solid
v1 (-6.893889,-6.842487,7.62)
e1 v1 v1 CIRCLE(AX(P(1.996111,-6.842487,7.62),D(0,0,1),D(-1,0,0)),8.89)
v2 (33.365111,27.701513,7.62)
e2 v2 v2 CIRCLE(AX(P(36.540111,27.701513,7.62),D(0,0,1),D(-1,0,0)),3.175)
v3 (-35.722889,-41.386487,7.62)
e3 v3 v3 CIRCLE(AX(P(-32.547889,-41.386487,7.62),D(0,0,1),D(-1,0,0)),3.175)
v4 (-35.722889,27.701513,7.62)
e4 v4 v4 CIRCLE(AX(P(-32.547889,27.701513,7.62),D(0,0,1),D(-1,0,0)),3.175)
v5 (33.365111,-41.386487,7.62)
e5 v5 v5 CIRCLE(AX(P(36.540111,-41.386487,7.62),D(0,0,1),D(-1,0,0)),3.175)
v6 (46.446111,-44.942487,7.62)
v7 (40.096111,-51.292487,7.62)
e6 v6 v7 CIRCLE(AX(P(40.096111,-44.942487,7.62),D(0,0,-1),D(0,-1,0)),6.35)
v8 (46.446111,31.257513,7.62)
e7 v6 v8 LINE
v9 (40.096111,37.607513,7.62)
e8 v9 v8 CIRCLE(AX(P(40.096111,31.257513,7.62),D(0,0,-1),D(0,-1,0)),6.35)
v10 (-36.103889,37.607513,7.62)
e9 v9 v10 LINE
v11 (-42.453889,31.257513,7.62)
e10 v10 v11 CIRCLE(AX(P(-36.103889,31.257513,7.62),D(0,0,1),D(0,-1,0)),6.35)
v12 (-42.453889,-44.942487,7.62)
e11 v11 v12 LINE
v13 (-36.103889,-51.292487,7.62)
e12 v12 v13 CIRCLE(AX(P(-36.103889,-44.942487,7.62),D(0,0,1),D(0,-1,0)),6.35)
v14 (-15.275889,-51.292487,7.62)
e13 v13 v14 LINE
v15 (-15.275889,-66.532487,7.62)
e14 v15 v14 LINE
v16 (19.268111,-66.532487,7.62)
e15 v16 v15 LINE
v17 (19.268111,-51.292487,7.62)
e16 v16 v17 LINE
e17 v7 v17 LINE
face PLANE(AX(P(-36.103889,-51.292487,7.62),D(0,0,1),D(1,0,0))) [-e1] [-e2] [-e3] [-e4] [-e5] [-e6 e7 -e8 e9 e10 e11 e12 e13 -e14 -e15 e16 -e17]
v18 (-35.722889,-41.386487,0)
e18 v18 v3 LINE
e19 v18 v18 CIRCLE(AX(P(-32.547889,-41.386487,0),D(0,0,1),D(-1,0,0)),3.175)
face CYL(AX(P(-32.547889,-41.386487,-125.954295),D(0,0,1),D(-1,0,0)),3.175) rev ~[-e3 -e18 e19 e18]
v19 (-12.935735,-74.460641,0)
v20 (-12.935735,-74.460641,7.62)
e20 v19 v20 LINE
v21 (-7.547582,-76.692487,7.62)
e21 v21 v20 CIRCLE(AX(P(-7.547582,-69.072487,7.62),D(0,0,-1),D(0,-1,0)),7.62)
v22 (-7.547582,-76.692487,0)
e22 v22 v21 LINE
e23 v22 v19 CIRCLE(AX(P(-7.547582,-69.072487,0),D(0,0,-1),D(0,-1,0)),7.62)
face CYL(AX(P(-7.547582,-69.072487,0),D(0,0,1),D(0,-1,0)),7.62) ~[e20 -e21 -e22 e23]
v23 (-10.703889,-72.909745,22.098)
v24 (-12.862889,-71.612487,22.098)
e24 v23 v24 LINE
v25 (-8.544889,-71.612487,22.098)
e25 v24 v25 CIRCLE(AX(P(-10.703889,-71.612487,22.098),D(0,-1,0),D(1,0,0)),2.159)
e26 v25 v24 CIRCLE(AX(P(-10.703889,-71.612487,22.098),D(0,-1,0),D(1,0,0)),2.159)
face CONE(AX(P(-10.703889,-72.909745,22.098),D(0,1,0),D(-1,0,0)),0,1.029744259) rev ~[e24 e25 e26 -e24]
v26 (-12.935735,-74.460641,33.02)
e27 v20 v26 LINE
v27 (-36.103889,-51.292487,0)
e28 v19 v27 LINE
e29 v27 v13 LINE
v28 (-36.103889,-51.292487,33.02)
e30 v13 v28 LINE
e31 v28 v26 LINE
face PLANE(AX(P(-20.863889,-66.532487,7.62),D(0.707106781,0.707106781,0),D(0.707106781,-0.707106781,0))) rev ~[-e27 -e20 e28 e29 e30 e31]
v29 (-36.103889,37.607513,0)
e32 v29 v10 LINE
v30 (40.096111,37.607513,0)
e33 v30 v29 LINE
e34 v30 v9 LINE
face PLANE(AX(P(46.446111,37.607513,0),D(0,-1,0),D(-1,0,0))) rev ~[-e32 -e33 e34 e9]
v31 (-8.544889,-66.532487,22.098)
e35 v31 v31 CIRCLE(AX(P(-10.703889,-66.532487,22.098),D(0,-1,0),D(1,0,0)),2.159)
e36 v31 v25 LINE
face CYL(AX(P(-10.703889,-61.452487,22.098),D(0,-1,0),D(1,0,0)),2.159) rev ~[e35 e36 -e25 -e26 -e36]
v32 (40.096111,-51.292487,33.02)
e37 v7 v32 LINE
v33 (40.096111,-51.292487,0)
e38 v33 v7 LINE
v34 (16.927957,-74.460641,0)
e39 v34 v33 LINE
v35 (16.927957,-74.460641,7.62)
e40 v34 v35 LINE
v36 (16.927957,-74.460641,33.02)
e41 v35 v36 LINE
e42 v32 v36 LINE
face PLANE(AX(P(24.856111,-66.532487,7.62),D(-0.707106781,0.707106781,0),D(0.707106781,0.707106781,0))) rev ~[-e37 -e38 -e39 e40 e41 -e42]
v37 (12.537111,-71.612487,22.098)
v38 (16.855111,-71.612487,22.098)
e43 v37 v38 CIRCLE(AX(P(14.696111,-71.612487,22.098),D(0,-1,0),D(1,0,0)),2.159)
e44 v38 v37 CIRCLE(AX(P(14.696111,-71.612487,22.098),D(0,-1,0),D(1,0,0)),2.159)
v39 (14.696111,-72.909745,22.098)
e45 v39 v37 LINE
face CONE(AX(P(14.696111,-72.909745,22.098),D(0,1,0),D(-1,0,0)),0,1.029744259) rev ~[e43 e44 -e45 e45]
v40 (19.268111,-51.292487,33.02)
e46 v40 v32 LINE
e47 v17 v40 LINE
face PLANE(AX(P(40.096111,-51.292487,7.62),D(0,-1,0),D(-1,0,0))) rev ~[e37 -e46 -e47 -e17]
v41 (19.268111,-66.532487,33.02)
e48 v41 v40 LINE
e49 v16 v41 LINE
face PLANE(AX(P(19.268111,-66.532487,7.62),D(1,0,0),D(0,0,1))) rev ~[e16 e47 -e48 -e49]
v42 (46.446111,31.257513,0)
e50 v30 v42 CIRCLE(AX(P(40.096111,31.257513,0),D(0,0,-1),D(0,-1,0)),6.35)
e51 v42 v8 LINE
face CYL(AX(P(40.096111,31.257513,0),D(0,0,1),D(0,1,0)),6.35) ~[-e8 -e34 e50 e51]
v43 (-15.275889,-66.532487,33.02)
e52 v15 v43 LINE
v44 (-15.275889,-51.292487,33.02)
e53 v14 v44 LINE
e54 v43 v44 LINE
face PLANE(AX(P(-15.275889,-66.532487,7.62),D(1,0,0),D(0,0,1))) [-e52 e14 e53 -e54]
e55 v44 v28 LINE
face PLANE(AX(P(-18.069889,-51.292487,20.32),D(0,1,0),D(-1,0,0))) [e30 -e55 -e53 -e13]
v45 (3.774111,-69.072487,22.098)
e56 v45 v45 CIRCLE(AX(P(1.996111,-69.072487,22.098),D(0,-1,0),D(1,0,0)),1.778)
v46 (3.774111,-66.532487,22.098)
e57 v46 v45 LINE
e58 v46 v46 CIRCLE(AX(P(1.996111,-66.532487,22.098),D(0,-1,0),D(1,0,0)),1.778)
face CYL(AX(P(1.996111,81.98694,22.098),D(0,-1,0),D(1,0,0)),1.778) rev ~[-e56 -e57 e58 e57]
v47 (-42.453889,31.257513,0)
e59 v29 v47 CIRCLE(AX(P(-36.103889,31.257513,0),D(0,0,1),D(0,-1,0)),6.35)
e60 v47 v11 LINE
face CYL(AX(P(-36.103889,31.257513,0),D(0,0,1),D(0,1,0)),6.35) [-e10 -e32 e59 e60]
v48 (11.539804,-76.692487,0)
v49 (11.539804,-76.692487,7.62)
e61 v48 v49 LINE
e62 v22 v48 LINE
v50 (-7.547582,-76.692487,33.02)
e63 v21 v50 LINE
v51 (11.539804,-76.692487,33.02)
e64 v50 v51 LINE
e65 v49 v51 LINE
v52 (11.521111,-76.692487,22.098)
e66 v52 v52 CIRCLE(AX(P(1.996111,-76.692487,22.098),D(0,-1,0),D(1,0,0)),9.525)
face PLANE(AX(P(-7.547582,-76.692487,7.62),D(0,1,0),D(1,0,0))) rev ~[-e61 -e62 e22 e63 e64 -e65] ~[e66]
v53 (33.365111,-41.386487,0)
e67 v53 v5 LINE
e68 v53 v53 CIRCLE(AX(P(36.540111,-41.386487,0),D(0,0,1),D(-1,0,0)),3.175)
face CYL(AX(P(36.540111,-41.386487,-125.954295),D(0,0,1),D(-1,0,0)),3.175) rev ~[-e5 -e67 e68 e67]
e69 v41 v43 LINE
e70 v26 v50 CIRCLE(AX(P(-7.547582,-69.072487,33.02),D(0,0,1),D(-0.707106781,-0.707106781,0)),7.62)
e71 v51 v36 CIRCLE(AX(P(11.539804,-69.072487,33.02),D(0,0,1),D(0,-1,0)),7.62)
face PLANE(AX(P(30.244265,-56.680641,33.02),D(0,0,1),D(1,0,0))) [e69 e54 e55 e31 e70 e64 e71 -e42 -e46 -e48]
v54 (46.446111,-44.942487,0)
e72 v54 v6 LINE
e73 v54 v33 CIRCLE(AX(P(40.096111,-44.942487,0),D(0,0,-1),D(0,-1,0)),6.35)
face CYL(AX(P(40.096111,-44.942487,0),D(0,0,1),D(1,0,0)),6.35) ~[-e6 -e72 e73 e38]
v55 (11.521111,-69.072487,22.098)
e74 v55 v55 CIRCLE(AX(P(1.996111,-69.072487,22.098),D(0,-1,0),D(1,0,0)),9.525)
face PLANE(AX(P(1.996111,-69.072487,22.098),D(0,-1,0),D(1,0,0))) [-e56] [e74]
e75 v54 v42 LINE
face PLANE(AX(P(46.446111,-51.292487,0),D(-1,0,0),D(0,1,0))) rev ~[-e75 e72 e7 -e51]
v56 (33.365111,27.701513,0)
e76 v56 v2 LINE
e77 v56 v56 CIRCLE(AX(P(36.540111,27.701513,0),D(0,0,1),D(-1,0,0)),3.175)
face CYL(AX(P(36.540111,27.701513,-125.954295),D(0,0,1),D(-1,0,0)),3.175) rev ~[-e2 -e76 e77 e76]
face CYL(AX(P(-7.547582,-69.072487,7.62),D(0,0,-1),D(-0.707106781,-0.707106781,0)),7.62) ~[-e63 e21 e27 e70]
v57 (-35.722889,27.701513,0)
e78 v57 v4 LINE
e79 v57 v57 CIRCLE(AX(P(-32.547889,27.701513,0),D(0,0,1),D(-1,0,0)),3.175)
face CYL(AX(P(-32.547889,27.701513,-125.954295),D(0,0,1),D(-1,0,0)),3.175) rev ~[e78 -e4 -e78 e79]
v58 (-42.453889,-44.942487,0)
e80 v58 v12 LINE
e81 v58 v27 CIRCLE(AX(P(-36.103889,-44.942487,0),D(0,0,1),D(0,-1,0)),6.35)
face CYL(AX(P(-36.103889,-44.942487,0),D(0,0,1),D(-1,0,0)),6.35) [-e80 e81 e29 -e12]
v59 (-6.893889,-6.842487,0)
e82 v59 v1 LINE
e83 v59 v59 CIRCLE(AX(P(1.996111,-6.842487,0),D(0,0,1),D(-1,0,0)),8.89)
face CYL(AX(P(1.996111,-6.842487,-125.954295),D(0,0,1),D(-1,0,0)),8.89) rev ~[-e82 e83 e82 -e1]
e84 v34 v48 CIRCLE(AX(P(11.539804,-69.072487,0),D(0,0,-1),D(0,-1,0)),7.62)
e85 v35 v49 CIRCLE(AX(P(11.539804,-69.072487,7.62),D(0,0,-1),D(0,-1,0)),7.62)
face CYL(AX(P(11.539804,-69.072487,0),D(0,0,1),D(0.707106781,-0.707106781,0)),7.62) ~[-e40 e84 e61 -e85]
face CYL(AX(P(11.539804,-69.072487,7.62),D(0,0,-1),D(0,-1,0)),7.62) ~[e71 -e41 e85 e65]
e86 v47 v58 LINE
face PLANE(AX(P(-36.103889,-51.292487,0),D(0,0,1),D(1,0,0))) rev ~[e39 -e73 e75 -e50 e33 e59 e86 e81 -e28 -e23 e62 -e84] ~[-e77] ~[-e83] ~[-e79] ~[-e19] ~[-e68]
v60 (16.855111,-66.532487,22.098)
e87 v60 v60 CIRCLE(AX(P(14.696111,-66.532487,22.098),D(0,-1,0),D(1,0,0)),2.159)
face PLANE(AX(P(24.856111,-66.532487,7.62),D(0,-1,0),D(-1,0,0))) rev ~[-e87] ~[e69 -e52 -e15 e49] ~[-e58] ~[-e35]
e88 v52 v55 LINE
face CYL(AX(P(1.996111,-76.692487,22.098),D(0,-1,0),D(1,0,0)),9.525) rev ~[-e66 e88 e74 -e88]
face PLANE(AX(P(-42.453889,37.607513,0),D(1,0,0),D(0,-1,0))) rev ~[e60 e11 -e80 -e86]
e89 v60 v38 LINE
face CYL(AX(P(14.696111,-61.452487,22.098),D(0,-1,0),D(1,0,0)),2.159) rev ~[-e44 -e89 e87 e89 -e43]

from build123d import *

# Parameters (mm, degrees)
F0_W        = 20.32
F0_H        = 50.8
F1_DEPTH    = 7.62
F2_D        = 6.35
F3_R        = 6.35
F4_D        = 17.78
F5_DEPTH    = 25.4
F6_T1_DEPTH = 138.2614957887
F7_R        = 7.62
F9_DEPTH    = 25.4
F11_D       = 4.318
F11_DEPTH   = 5.08
F11_TIP     = 1.2972580765
F12_D       = 3.556
F13_R       = 9.525
F13_R_2     = 1.778
F14_DEPTH   = 7.62
F10_W       = 5.588
F10_H       = 25.4
F16_DEPTH   = 15.24
F17_DEPTH   = 25.4


# Not quite as in the source:
# - a fillet or chamfer that OpenCascade refuses, or shapes differently, is made with other operations: its cross-section is extruded or revolved along the edge and cut away or added


with BuildPart() as f1:
    # F0 (on Top) → F1 (new body)
    with BuildSketch(Plane.XY):
        Polygon((46.4461110532, 37.6075126914), (-42.4538889468, 37.6075126914), (-42.4538889468, -51.2924873086), (46.4461110532, -51.2924873086), (46.4461110532, -32.2424873086), (26.1261110532, -32.2424873086), (26.1261110532, 18.5575126914), (46.4461110532, 18.5575126914), align=None)
        with Locations((36.2861110532, -6.8424873086)):
            Rectangle(F0_W, F0_H)
    extrude(amount=F1_DEPTH)

    # F2 (through all)
    with Locations(Plane(origin=(0, 0, 0), x_dir=(1, 0, 0), z_dir=(0, 0, -1))):
        with Locations((-32.5478889468, -27.7015126914), (36.5401110532, -27.7015126914), (36.5401110532, 41.3864873086), (-32.5478889468, 41.3864873086)):
            Hole(F2_D / 2)

    # F3
    f3_edges = [f1.edges().sort_by_distance(p)[0] for p in [
        (-42.453889, -51.292487, 3.81),
        (46.446111, -51.292487, 3.81),
        (46.446111, 37.607513, 3.81),
        (-42.453889, 37.607513, 3.81),
    ]]
    fillet(f3_edges, radius=F3_R)

    # F4 (through all)
    with Locations(Plane(origin=(0, 0, 0), x_dir=(1, 0, 0), z_dir=(0, 0, -1))):
        with Locations((1.9961110532, 6.8424873086)):
            Hole(F4_D / 2)

    # F5 (add): a face of the model
    f5_faces = [f1.faces().sort_by_distance(p)[0] for p in [
        (1.9961110532, -51.2924873086, 3.81),
    ]]
    extrude(f5_faces, amount=F5_DEPTH)

    # F6: chamfer of 25.4 on 3 edges, made by hand

    # F6_s2 → F6_t1 (cut)
    with BuildSketch(Plane.XY.offset(-65.3207478943)):
        Polygon((40.0961110532, -51.2924873086), (14.6961110532, -76.6924873086), (40.0961110532, -76.6924873086), align=None)
        Polygon((-36.1038889468, -51.2924873086), (-10.7038889468, -76.6924873086), (-36.1038889468, -76.6924873086), align=None)
    extrude(amount=F6_T1_DEPTH, mode=Mode.SUBTRACT)

    # F7
    f7_edges = [f1.edges().sort_by_distance(p)[0] for p in [
        (14.696111, -76.692487, 3.81),
        (-10.703889, -76.692487, 3.81),
    ]]
    fillet(f7_edges, radius=F7_R)

    # F8 (on face) → F9 (join)
    with BuildSketch(Plane.XY.offset(7.62)):
        with BuildLine():
            Line((24.8561110532, -66.5324873086), (-20.8638889468, -66.5324873086))
            Line((-20.8638889468, -66.5324873086), (-12.9357352742, -74.4606409812))
            ThreePointArc((-12.9357352742, -74.4606409812), (-10.4636293562, -76.1124493463), (-7.5475816015, -76.6924873086))
            Line((-7.5475816015, -76.6924873086), (11.5398037079, -76.6924873086))
            ThreePointArc((11.5398037079, -76.6924873086), (14.4558514626, -76.1124493463), (16.9279573806, -74.4606409812))
            Line((16.9279573806, -74.4606409812), (24.8561110532, -66.5324873086))
        make_face()
    extrude(amount=F9_DEPTH)

    # F11
    with Locations(Plane(origin=(0, -66.5324873086, 0), x_dir=(-1, 0, 0), z_dir=(0, 1, 0))):
        with Locations((-14.6961110532, 22.098), (10.7038889468, 22.098)):
            Hole(F11_D / 2, depth=F11_DEPTH)
            with Locations((0, 0, -(F11_DEPTH + F11_TIP / 2))):  # 118° drill point
                Cone(0, F11_D / 2, F11_TIP, mode=Mode.SUBTRACT)

    # F12 (through all)
    with Locations(Plane(origin=(0, -66.5324873086, 0), x_dir=(-1, 0, 0), z_dir=(0, 1, 0))):
        with Locations((-1.9961110532, 22.098)):
            Hole(F12_D / 2)

    # F13 (on face) → F14 (cut)
    with BuildSketch(Plane.XZ.offset(76.6924873086)):
        with Locations((1.9961110532, 22.098)):
            Circle(F13_R)
        with Locations((1.9961110532, 22.098)):
            Circle(F13_R_2, mode=Mode.SUBTRACT)
    extrude(amount=-F14_DEPTH, mode=Mode.SUBTRACT)

    # F10 (on face) → F16 (join)
    with BuildSketch(Plane(origin=(0, -66.5324873086, 0), x_dir=(-1, 0, 0), z_dir=(0, 1, 0))):
        with Locations((-22.0621110532, 20.32)):
            Rectangle(F10_W, F10_H)
        with Locations((18.0698889468, 20.32)):
            Rectangle(F10_W, F10_H)
    extrude(amount=F16_DEPTH)

    # F15 (on face) → F17 (join)
    with BuildSketch(Plane.XY.offset(7.62)):
        Polygon((24.8561110532, -66.5324873086), (40.0961110532, -51.2924873086), (24.8561110532, -51.2924873086), align=None)
        Polygon((-36.1038889468, -51.2924873086), (-20.8638889468, -66.5324873086), (-20.8638889468, -51.2924873086), align=None)
    extrude(amount=F17_DEPTH)


solid = f1.part
